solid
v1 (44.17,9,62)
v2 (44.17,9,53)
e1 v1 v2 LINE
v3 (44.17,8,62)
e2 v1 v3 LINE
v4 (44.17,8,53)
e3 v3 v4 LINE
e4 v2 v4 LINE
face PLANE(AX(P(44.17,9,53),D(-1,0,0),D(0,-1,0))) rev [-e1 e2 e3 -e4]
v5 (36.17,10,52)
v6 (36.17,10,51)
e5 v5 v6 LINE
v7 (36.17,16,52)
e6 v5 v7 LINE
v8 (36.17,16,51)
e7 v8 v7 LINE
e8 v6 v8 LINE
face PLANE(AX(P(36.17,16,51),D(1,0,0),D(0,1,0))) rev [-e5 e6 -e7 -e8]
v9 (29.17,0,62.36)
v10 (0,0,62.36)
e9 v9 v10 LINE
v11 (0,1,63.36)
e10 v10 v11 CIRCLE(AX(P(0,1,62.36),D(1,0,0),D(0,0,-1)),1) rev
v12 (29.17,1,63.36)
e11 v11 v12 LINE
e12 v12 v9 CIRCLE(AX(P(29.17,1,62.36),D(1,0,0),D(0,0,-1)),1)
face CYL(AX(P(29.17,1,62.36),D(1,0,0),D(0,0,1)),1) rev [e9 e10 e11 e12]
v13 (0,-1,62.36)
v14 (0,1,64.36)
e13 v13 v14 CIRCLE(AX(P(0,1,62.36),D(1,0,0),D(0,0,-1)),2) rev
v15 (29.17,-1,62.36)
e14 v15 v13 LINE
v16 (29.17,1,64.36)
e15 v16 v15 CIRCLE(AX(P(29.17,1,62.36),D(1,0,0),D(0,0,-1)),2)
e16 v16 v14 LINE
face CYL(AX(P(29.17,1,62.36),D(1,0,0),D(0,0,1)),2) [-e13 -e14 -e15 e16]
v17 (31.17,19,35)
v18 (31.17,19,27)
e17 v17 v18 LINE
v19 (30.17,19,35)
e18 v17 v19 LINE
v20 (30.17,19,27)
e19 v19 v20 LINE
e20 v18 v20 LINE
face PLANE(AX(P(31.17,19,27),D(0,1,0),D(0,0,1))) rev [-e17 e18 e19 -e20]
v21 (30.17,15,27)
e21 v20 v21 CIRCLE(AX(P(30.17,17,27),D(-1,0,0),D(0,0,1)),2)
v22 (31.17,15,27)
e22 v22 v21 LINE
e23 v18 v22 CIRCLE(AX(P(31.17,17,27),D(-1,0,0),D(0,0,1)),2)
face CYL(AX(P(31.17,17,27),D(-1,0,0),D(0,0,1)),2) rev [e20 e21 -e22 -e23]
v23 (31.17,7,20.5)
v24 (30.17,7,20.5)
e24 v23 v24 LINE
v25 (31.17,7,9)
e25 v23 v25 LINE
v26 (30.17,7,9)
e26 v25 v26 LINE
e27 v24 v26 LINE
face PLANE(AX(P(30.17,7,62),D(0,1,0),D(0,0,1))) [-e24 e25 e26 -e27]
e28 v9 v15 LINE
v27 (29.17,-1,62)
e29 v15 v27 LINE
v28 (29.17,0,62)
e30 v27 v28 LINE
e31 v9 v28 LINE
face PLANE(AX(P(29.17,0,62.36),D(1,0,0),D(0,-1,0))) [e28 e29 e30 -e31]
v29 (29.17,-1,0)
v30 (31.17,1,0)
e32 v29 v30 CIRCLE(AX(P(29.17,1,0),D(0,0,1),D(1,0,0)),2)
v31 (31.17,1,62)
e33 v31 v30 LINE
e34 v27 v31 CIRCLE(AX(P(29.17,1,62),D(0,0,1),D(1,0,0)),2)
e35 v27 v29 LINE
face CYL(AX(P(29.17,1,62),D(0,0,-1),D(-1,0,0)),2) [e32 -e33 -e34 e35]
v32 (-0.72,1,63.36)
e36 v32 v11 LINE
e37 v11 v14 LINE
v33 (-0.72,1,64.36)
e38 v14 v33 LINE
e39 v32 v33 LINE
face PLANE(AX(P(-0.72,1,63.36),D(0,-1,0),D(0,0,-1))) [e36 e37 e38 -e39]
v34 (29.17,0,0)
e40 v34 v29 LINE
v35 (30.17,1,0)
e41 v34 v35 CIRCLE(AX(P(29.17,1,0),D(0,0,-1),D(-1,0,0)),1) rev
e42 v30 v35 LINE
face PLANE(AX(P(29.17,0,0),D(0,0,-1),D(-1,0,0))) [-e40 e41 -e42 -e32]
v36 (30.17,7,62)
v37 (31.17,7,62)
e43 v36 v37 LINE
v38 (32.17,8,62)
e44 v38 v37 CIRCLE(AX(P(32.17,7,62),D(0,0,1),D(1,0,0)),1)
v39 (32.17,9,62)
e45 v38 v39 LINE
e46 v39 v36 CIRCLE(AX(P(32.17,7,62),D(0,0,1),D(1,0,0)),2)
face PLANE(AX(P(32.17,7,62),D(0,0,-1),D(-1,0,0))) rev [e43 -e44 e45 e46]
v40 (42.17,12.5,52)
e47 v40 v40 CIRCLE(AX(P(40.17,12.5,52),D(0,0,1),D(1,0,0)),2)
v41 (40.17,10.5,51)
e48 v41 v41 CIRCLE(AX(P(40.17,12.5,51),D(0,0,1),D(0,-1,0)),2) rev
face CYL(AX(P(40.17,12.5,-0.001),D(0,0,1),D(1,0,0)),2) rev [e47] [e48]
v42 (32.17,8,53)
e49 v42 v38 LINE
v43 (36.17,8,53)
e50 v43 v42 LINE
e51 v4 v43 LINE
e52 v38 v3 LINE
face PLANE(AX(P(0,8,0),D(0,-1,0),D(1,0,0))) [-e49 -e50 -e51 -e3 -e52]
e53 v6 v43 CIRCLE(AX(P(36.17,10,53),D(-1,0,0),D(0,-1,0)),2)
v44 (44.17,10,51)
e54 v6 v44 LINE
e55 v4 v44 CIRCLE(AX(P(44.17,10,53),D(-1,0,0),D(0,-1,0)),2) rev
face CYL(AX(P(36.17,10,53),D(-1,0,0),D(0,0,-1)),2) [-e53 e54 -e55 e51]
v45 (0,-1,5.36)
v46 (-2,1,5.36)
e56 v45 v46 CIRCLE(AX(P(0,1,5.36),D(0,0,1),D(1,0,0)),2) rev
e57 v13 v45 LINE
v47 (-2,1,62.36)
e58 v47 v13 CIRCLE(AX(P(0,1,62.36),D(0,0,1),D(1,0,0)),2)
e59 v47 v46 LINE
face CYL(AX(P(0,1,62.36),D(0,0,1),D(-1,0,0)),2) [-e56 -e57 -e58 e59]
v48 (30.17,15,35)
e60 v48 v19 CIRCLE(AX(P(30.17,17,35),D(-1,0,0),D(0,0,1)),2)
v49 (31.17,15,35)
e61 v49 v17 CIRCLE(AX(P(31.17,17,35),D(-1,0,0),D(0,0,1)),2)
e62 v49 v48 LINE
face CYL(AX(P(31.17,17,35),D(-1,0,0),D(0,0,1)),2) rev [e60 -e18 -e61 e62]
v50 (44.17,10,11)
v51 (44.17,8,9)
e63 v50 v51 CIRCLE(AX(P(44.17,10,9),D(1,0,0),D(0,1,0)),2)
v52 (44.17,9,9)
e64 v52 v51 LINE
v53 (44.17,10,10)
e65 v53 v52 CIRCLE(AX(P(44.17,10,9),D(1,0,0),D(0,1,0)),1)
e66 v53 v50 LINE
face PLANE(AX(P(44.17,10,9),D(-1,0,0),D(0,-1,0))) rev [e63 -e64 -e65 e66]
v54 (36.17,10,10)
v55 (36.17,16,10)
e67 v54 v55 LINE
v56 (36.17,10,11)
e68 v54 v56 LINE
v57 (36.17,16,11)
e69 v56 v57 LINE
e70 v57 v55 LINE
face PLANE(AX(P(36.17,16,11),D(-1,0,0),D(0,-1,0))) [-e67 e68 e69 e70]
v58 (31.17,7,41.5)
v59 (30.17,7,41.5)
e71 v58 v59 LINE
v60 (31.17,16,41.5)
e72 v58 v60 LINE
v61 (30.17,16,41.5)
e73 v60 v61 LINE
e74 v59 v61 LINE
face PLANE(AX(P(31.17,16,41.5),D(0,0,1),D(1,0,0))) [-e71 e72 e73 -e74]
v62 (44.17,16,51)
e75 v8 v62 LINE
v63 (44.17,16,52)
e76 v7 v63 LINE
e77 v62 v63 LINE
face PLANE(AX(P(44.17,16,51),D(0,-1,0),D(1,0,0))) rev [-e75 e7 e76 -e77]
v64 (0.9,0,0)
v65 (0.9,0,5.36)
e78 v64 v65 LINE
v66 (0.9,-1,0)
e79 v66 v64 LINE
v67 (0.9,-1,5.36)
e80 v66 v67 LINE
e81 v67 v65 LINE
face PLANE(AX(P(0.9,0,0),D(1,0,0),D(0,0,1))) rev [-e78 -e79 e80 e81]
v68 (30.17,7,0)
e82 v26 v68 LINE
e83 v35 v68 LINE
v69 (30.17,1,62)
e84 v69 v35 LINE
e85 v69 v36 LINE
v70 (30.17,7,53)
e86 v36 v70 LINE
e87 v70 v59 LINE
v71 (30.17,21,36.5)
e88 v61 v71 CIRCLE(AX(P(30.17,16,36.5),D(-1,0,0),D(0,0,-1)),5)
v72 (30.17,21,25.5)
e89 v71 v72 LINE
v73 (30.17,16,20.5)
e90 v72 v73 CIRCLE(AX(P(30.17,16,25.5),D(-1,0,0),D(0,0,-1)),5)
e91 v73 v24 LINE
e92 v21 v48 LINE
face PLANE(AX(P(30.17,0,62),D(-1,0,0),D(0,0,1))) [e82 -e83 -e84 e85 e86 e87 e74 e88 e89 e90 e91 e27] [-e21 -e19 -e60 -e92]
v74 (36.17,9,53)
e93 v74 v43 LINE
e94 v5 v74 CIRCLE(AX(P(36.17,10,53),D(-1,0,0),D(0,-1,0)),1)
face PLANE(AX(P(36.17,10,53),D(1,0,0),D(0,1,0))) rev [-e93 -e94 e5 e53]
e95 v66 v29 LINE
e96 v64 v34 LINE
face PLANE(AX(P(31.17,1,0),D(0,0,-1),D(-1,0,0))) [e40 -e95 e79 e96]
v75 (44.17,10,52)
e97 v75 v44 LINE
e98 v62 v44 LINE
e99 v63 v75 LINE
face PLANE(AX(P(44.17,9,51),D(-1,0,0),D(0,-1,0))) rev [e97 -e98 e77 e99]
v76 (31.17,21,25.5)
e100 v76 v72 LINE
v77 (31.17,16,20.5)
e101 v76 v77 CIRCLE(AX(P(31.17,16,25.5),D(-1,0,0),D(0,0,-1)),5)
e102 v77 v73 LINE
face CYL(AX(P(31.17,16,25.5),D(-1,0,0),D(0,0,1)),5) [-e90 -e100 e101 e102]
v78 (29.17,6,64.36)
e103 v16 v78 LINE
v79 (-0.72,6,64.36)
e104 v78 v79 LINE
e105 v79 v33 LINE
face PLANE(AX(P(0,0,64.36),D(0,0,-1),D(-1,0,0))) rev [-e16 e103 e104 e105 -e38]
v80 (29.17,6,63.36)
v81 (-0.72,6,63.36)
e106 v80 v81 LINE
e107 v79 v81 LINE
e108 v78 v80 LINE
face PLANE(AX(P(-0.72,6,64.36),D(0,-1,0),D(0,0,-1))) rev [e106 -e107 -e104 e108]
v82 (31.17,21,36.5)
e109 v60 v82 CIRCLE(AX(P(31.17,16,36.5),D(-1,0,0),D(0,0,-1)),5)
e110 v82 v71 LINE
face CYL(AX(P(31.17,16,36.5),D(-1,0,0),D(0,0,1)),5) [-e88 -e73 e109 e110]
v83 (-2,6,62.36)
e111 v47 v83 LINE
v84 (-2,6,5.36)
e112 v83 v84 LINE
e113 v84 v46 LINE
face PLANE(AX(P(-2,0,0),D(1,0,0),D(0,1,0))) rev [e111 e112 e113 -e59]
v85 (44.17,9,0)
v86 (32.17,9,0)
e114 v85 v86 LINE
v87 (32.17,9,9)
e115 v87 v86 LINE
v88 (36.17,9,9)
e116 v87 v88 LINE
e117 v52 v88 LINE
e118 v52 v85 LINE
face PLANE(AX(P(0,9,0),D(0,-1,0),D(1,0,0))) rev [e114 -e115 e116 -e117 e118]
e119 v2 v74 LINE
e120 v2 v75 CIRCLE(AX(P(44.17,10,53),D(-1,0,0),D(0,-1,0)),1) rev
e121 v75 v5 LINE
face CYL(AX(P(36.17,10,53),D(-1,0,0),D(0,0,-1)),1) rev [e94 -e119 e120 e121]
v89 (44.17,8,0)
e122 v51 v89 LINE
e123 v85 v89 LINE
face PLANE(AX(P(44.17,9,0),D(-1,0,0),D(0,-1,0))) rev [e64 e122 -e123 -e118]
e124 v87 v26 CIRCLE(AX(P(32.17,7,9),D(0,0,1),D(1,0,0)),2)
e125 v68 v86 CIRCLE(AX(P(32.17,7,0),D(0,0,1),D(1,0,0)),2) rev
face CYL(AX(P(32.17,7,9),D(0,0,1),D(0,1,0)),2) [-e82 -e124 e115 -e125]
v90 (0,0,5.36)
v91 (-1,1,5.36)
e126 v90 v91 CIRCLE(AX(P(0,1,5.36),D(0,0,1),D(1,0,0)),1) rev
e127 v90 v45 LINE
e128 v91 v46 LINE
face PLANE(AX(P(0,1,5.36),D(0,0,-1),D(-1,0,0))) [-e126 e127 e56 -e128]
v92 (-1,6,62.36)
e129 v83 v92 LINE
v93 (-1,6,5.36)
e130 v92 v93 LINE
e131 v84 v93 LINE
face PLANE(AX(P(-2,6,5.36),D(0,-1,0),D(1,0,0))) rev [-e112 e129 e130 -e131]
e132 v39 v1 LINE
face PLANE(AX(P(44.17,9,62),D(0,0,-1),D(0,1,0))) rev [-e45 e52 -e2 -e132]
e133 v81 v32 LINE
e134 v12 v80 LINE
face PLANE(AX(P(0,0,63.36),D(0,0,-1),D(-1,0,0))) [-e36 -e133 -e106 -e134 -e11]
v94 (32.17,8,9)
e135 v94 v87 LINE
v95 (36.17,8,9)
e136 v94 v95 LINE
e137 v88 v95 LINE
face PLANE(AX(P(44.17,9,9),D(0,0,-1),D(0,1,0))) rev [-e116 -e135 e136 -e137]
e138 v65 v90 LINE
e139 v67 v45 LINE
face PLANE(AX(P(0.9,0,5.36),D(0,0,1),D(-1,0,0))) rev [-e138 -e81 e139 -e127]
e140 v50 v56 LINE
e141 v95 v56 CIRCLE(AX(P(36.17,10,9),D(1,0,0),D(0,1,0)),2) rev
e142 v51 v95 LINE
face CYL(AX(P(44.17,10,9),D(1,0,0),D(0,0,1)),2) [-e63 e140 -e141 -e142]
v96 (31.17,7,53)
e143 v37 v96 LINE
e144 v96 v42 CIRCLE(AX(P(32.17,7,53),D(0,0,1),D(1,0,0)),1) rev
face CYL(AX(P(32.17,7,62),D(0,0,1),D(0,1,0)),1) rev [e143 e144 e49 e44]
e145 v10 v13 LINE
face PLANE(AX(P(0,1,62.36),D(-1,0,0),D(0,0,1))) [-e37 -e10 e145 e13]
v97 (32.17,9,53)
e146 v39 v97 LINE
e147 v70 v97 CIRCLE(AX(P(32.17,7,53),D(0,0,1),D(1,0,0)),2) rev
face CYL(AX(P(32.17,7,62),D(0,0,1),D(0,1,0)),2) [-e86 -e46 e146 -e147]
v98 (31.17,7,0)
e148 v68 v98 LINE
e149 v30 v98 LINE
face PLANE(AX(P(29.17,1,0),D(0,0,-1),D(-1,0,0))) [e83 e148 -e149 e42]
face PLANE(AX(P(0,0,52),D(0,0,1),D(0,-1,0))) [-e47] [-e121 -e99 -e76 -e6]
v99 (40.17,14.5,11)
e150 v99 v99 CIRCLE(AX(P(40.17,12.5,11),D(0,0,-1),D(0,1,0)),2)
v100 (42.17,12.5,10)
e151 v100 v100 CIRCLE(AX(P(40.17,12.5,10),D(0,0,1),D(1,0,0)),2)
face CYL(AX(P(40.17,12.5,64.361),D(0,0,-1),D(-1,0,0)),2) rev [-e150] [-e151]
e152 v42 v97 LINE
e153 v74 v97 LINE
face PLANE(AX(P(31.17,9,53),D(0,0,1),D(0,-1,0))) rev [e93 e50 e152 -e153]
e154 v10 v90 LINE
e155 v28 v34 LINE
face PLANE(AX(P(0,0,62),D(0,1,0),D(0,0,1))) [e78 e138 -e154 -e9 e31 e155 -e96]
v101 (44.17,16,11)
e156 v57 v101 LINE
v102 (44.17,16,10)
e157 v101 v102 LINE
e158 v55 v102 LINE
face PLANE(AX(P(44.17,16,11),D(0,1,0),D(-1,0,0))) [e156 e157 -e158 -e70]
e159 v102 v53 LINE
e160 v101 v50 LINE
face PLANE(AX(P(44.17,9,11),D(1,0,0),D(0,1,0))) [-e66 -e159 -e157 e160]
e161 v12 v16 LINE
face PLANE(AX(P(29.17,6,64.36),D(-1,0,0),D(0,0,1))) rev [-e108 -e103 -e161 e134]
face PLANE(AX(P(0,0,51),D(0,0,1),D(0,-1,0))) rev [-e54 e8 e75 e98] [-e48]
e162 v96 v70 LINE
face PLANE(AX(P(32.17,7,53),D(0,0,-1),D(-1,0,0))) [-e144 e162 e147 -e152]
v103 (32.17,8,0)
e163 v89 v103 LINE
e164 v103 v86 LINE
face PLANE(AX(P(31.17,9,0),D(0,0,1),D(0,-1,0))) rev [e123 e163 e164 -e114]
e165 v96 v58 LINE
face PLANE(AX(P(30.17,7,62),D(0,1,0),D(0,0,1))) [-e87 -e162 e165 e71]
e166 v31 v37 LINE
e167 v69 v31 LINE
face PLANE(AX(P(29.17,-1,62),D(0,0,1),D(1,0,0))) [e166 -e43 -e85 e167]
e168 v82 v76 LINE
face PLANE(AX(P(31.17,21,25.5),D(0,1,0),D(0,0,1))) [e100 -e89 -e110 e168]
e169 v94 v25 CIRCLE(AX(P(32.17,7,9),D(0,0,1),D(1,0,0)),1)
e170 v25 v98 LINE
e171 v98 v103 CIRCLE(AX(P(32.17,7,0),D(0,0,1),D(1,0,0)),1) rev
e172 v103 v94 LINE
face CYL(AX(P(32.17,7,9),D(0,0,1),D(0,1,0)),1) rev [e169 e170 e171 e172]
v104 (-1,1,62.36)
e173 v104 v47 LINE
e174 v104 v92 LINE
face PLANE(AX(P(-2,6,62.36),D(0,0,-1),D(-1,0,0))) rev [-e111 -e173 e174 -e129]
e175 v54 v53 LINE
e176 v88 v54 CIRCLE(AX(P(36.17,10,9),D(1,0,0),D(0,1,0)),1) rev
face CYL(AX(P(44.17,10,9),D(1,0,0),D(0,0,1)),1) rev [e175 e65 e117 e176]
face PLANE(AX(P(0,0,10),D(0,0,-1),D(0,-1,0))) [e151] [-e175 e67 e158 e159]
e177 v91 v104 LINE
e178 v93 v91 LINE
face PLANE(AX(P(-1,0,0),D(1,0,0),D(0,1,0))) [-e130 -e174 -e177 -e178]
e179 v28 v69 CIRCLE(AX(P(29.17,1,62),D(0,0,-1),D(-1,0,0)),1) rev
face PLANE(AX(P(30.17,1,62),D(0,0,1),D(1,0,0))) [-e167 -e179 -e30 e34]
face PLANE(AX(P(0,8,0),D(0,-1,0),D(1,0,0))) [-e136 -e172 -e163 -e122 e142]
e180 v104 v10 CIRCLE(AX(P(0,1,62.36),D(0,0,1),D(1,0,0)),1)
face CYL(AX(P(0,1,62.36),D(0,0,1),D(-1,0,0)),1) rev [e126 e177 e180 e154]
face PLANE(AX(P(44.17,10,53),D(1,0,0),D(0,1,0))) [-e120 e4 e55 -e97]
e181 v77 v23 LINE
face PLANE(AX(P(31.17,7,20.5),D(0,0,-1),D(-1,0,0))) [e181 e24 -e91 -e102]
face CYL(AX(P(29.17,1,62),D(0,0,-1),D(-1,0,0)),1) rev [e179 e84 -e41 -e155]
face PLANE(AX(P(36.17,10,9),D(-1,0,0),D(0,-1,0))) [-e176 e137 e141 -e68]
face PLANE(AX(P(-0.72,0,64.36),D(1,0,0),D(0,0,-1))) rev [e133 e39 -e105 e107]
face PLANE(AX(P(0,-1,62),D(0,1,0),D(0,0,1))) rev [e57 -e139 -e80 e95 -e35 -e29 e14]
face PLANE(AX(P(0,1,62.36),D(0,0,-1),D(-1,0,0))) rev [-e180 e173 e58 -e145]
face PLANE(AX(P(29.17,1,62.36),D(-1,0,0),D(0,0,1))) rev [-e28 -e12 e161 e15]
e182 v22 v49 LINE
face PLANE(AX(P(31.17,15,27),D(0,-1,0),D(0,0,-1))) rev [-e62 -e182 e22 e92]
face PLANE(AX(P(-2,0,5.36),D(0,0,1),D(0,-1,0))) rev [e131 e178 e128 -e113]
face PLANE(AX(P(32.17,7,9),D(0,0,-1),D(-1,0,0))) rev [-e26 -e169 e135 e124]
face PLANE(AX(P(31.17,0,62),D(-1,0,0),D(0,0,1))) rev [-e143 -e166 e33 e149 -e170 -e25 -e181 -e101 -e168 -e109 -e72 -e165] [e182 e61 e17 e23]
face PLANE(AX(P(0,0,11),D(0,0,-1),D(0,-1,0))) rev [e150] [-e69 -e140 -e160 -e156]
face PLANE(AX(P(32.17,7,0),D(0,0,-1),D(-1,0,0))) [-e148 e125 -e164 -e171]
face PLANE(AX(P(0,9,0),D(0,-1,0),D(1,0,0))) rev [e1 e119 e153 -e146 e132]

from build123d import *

# Parameters (mm, degrees)
Z_KLADN_PLECH1_DEPTH     = 62
LEM_Z_HRANY1_DEPTH       = 29.17
LEM_START                = 1
LEM_Z_HRANY1_PROFILE_W   = 29.89
LEM_Z_HRANY1_PROFILE_H   = 5
LEM_Z_HRANY1_FLAT_DEPTH  = 1
LEM_Z_HRANY2_DEPTH       = 57
SKICA12_W                = 5.36
SKICA12_H                = 1
ODEBRAT_VYSUNUT_M1_DEPTH = 0.9
OU_KO2_DEPTH             = 1
LEM_Z_HRANY3_DEPTH       = 9
LEM_Z_HRANY4_DEPTH       = 8
ODEBRAT_VYSUNUT_M2_REACH = 73.386
SKICA25_R                = 2
LEM_Z_HRANY5_DEPTH       = 9


# Sheet-metal steps are written as plain solids
with BuildPart() as part:
    # Skica1 → Základní plech1 (new body)
    with BuildSketch(Plane.XY):
        with BuildLine():
            Line((0, 0), (29.17, 0))
            ThreePointArc((29.17, 0), (29.877106781, 0.292893219), (30.17, 1))
            Line((30.17, 1), (30.17, 7))
            Line((30.17, 7), (31.17, 7))
            Line((31.17, 7), (31.17, 1))
            ThreePointArc((31.17, 1), (30.584213562, -0.414213562), (29.17, -1))
            Line((29.17, -1), (0, -1))
            Line((0, -1), (0, 0))
        make_face()
    extrude(amount=Z_KLADN_PLECH1_DEPTH)

    # Lem z hrany1 bend section (across the edge) → Lem z hrany1 (add)
    with BuildSketch(Plane(origin=(0, 0, 63.36), x_dir=(0, 0, -1), z_dir=(1, 0, 0))):
        with BuildLine():
            Line((-1, 1), (0, 1))
            ThreePointArc((0, 1), (0.292893219, 0.292893219), (1, 0))
            Line((1, 0), (1.36, 0))
            Line((1.36, 0), (1.36, -1))
            Line((1.36, -1), (1, -1))
            ThreePointArc((1, -1), (-0.414213562, -0.414213562), (-1, 1))
        make_face()
    extrude(amount=LEM_Z_HRANY1_DEPTH)

    # Lem z hrany1 profile (on flange) → Lem z hrany1 flat (add)
    with BuildSketch(Plane.XY.offset(63.36).offset(LEM_START)):
        with Locations((14.225, 3.5)):
            Rectangle(LEM_Z_HRANY1_PROFILE_W, LEM_Z_HRANY1_PROFILE_H)
    extrude(amount=-LEM_Z_HRANY1_FLAT_DEPTH)

    # Lem z hrany2 section (across the edge) → Lem z hrany2 (add)
    with BuildSketch(Plane(origin=(-1, 0, 5.36), x_dir=(1, 0, 0), z_dir=(0, 0, 1))):
        with BuildLine():
            Line((-1, 1), (-1, 6))
            Line((-1, 6), (0, 6))
            Line((0, 6), (0, 1))
            ThreePointArc((0, 1), (0.292893219, 0.292893219), (1, 0))
            Line((1, 0), (1, -1))
            ThreePointArc((1, -1), (-0.414213562, -0.414213562), (-1, 1))
        make_face()
    extrude(amount=LEM_Z_HRANY2_DEPTH)

    # Skica12 → Odebrat vysunutím1 (cut)
    with BuildSketch(Plane.ZY):
        with Locations((2.68, -0.5)):
            Rectangle(SKICA12_W, SKICA12_H)
    extrude(amount=-ODEBRAT_VYSUNUT_M1_DEPTH, mode=Mode.SUBTRACT)

    # Skica13 → Ouško2 (add)
    with BuildSketch(Plane.ZY.offset(-30.17)):
        with BuildLine():
            Line((20.5, 7), (20.5, 16))
            ThreePointArc((20.5, 16), (21.964466094, 19.535533906), (25.5, 21))
            Line((25.5, 21), (36.5, 21))
            ThreePointArc((36.5, 21), (40.035533906, 19.535533906), (41.5, 16))
            Line((41.5, 16), (41.5, 7))
            Line((41.5, 7), (20.5, 7))
        make_face()
        with BuildLine():
            Line((27, 19), (35, 19))
            ThreePointArc((35, 19), (37, 17), (35, 15))
            Line((35, 15), (27, 15))
            ThreePointArc((27, 15), (25, 17), (27, 19))
        make_face(mode=Mode.SUBTRACT)
    extrude(amount=-OU_KO2_DEPTH)

    # Lem z hrany3 section (across the edge) → Lem z hrany3 (add)
    with BuildSketch(Plane(origin=(31.17, 8, 53), x_dir=(0, -1, 0), z_dir=(0, 0, 1))):
        with BuildLine():
            Line((-1, 1), (-1, 13))
            Line((-1, 13), (0, 13))
            Line((0, 13), (0, 1))
            ThreePointArc((0, 1), (0.292893219, 0.292893219), (1, 0))
            Line((1, 0), (1, -1))
            ThreePointArc((1, -1), (-0.414213562, -0.414213562), (-1, 1))
        make_face()
    extrude(amount=LEM_Z_HRANY3_DEPTH)

    # Lem z hrany4 section (across the edge) → Lem z hrany4 (add)
    with BuildSketch(Plane(origin=(44.17, 9, 52), x_dir=(0, 0, 1), z_dir=(-1, 0, 0))):
        with BuildLine():
            Line((-1, 1), (-1, 7))
            Line((-1, 7), (0, 7))
            Line((0, 7), (0, 1))
            ThreePointArc((0, 1), (0.292893219, 0.292893219), (1, 0))
            Line((1, 0), (1, -1))
            ThreePointArc((1, -1), (-0.414213562, -0.414213562), (-1, 1))
        make_face()
    lem_z_hrany4 = extrude(amount=LEM_Z_HRANY4_DEPTH)

    # Skica25 → Odebrat vysunutím2 (cut, up to next)
    with BuildSketch(Plane.XY.offset(52), mode=Mode.PRIVATE) as odebrat_vysunut_m2_sk1:
        with Locations((40.17, 12.5)):
            Circle(SKICA25_R)
    odebrat_vysunut_m2_tool1 = extrude(odebrat_vysunut_m2_sk1.sketch, amount=-ODEBRAT_VYSUNUT_M2_REACH, mode=Mode.PRIVATE) & part.part
    odebrat_vysunut_m2 = odebrat_vysunut_m2_tool1.solids().sort_by_distance((40.17, 12.5, 52))[0]
    add(odebrat_vysunut_m2, mode=Mode.SUBTRACT)

    # Lem z hrany5 section (across the edge) → Lem z hrany5 (add)
    with BuildSketch(Plane(origin=(31.17, 8, 0), x_dir=(0, -1, 0), z_dir=(0, 0, 1))):
        with BuildLine():
            Line((-1, 1), (-1, 13))
            Line((-1, 13), (0, 13))
            Line((0, 13), (0, 1))
            ThreePointArc((0, 1), (0.292893219, 0.292893219), (1, 0))
            Line((1, 0), (1, -1))
            ThreePointArc((1, -1), (-0.414213562, -0.414213562), (-1, 1))
        make_face()
    extrude(amount=LEM_Z_HRANY5_DEPTH)

    # Zrcadlit1: Lem z hrany4, Odebrat vysunutím2 across plane
    add(lem_z_hrany4.mirror(Plane.XY.offset(31)))
    add(odebrat_vysunut_m2.mirror(Plane.XY.offset(31)), mode=Mode.SUBTRACT)


solid = part.part
